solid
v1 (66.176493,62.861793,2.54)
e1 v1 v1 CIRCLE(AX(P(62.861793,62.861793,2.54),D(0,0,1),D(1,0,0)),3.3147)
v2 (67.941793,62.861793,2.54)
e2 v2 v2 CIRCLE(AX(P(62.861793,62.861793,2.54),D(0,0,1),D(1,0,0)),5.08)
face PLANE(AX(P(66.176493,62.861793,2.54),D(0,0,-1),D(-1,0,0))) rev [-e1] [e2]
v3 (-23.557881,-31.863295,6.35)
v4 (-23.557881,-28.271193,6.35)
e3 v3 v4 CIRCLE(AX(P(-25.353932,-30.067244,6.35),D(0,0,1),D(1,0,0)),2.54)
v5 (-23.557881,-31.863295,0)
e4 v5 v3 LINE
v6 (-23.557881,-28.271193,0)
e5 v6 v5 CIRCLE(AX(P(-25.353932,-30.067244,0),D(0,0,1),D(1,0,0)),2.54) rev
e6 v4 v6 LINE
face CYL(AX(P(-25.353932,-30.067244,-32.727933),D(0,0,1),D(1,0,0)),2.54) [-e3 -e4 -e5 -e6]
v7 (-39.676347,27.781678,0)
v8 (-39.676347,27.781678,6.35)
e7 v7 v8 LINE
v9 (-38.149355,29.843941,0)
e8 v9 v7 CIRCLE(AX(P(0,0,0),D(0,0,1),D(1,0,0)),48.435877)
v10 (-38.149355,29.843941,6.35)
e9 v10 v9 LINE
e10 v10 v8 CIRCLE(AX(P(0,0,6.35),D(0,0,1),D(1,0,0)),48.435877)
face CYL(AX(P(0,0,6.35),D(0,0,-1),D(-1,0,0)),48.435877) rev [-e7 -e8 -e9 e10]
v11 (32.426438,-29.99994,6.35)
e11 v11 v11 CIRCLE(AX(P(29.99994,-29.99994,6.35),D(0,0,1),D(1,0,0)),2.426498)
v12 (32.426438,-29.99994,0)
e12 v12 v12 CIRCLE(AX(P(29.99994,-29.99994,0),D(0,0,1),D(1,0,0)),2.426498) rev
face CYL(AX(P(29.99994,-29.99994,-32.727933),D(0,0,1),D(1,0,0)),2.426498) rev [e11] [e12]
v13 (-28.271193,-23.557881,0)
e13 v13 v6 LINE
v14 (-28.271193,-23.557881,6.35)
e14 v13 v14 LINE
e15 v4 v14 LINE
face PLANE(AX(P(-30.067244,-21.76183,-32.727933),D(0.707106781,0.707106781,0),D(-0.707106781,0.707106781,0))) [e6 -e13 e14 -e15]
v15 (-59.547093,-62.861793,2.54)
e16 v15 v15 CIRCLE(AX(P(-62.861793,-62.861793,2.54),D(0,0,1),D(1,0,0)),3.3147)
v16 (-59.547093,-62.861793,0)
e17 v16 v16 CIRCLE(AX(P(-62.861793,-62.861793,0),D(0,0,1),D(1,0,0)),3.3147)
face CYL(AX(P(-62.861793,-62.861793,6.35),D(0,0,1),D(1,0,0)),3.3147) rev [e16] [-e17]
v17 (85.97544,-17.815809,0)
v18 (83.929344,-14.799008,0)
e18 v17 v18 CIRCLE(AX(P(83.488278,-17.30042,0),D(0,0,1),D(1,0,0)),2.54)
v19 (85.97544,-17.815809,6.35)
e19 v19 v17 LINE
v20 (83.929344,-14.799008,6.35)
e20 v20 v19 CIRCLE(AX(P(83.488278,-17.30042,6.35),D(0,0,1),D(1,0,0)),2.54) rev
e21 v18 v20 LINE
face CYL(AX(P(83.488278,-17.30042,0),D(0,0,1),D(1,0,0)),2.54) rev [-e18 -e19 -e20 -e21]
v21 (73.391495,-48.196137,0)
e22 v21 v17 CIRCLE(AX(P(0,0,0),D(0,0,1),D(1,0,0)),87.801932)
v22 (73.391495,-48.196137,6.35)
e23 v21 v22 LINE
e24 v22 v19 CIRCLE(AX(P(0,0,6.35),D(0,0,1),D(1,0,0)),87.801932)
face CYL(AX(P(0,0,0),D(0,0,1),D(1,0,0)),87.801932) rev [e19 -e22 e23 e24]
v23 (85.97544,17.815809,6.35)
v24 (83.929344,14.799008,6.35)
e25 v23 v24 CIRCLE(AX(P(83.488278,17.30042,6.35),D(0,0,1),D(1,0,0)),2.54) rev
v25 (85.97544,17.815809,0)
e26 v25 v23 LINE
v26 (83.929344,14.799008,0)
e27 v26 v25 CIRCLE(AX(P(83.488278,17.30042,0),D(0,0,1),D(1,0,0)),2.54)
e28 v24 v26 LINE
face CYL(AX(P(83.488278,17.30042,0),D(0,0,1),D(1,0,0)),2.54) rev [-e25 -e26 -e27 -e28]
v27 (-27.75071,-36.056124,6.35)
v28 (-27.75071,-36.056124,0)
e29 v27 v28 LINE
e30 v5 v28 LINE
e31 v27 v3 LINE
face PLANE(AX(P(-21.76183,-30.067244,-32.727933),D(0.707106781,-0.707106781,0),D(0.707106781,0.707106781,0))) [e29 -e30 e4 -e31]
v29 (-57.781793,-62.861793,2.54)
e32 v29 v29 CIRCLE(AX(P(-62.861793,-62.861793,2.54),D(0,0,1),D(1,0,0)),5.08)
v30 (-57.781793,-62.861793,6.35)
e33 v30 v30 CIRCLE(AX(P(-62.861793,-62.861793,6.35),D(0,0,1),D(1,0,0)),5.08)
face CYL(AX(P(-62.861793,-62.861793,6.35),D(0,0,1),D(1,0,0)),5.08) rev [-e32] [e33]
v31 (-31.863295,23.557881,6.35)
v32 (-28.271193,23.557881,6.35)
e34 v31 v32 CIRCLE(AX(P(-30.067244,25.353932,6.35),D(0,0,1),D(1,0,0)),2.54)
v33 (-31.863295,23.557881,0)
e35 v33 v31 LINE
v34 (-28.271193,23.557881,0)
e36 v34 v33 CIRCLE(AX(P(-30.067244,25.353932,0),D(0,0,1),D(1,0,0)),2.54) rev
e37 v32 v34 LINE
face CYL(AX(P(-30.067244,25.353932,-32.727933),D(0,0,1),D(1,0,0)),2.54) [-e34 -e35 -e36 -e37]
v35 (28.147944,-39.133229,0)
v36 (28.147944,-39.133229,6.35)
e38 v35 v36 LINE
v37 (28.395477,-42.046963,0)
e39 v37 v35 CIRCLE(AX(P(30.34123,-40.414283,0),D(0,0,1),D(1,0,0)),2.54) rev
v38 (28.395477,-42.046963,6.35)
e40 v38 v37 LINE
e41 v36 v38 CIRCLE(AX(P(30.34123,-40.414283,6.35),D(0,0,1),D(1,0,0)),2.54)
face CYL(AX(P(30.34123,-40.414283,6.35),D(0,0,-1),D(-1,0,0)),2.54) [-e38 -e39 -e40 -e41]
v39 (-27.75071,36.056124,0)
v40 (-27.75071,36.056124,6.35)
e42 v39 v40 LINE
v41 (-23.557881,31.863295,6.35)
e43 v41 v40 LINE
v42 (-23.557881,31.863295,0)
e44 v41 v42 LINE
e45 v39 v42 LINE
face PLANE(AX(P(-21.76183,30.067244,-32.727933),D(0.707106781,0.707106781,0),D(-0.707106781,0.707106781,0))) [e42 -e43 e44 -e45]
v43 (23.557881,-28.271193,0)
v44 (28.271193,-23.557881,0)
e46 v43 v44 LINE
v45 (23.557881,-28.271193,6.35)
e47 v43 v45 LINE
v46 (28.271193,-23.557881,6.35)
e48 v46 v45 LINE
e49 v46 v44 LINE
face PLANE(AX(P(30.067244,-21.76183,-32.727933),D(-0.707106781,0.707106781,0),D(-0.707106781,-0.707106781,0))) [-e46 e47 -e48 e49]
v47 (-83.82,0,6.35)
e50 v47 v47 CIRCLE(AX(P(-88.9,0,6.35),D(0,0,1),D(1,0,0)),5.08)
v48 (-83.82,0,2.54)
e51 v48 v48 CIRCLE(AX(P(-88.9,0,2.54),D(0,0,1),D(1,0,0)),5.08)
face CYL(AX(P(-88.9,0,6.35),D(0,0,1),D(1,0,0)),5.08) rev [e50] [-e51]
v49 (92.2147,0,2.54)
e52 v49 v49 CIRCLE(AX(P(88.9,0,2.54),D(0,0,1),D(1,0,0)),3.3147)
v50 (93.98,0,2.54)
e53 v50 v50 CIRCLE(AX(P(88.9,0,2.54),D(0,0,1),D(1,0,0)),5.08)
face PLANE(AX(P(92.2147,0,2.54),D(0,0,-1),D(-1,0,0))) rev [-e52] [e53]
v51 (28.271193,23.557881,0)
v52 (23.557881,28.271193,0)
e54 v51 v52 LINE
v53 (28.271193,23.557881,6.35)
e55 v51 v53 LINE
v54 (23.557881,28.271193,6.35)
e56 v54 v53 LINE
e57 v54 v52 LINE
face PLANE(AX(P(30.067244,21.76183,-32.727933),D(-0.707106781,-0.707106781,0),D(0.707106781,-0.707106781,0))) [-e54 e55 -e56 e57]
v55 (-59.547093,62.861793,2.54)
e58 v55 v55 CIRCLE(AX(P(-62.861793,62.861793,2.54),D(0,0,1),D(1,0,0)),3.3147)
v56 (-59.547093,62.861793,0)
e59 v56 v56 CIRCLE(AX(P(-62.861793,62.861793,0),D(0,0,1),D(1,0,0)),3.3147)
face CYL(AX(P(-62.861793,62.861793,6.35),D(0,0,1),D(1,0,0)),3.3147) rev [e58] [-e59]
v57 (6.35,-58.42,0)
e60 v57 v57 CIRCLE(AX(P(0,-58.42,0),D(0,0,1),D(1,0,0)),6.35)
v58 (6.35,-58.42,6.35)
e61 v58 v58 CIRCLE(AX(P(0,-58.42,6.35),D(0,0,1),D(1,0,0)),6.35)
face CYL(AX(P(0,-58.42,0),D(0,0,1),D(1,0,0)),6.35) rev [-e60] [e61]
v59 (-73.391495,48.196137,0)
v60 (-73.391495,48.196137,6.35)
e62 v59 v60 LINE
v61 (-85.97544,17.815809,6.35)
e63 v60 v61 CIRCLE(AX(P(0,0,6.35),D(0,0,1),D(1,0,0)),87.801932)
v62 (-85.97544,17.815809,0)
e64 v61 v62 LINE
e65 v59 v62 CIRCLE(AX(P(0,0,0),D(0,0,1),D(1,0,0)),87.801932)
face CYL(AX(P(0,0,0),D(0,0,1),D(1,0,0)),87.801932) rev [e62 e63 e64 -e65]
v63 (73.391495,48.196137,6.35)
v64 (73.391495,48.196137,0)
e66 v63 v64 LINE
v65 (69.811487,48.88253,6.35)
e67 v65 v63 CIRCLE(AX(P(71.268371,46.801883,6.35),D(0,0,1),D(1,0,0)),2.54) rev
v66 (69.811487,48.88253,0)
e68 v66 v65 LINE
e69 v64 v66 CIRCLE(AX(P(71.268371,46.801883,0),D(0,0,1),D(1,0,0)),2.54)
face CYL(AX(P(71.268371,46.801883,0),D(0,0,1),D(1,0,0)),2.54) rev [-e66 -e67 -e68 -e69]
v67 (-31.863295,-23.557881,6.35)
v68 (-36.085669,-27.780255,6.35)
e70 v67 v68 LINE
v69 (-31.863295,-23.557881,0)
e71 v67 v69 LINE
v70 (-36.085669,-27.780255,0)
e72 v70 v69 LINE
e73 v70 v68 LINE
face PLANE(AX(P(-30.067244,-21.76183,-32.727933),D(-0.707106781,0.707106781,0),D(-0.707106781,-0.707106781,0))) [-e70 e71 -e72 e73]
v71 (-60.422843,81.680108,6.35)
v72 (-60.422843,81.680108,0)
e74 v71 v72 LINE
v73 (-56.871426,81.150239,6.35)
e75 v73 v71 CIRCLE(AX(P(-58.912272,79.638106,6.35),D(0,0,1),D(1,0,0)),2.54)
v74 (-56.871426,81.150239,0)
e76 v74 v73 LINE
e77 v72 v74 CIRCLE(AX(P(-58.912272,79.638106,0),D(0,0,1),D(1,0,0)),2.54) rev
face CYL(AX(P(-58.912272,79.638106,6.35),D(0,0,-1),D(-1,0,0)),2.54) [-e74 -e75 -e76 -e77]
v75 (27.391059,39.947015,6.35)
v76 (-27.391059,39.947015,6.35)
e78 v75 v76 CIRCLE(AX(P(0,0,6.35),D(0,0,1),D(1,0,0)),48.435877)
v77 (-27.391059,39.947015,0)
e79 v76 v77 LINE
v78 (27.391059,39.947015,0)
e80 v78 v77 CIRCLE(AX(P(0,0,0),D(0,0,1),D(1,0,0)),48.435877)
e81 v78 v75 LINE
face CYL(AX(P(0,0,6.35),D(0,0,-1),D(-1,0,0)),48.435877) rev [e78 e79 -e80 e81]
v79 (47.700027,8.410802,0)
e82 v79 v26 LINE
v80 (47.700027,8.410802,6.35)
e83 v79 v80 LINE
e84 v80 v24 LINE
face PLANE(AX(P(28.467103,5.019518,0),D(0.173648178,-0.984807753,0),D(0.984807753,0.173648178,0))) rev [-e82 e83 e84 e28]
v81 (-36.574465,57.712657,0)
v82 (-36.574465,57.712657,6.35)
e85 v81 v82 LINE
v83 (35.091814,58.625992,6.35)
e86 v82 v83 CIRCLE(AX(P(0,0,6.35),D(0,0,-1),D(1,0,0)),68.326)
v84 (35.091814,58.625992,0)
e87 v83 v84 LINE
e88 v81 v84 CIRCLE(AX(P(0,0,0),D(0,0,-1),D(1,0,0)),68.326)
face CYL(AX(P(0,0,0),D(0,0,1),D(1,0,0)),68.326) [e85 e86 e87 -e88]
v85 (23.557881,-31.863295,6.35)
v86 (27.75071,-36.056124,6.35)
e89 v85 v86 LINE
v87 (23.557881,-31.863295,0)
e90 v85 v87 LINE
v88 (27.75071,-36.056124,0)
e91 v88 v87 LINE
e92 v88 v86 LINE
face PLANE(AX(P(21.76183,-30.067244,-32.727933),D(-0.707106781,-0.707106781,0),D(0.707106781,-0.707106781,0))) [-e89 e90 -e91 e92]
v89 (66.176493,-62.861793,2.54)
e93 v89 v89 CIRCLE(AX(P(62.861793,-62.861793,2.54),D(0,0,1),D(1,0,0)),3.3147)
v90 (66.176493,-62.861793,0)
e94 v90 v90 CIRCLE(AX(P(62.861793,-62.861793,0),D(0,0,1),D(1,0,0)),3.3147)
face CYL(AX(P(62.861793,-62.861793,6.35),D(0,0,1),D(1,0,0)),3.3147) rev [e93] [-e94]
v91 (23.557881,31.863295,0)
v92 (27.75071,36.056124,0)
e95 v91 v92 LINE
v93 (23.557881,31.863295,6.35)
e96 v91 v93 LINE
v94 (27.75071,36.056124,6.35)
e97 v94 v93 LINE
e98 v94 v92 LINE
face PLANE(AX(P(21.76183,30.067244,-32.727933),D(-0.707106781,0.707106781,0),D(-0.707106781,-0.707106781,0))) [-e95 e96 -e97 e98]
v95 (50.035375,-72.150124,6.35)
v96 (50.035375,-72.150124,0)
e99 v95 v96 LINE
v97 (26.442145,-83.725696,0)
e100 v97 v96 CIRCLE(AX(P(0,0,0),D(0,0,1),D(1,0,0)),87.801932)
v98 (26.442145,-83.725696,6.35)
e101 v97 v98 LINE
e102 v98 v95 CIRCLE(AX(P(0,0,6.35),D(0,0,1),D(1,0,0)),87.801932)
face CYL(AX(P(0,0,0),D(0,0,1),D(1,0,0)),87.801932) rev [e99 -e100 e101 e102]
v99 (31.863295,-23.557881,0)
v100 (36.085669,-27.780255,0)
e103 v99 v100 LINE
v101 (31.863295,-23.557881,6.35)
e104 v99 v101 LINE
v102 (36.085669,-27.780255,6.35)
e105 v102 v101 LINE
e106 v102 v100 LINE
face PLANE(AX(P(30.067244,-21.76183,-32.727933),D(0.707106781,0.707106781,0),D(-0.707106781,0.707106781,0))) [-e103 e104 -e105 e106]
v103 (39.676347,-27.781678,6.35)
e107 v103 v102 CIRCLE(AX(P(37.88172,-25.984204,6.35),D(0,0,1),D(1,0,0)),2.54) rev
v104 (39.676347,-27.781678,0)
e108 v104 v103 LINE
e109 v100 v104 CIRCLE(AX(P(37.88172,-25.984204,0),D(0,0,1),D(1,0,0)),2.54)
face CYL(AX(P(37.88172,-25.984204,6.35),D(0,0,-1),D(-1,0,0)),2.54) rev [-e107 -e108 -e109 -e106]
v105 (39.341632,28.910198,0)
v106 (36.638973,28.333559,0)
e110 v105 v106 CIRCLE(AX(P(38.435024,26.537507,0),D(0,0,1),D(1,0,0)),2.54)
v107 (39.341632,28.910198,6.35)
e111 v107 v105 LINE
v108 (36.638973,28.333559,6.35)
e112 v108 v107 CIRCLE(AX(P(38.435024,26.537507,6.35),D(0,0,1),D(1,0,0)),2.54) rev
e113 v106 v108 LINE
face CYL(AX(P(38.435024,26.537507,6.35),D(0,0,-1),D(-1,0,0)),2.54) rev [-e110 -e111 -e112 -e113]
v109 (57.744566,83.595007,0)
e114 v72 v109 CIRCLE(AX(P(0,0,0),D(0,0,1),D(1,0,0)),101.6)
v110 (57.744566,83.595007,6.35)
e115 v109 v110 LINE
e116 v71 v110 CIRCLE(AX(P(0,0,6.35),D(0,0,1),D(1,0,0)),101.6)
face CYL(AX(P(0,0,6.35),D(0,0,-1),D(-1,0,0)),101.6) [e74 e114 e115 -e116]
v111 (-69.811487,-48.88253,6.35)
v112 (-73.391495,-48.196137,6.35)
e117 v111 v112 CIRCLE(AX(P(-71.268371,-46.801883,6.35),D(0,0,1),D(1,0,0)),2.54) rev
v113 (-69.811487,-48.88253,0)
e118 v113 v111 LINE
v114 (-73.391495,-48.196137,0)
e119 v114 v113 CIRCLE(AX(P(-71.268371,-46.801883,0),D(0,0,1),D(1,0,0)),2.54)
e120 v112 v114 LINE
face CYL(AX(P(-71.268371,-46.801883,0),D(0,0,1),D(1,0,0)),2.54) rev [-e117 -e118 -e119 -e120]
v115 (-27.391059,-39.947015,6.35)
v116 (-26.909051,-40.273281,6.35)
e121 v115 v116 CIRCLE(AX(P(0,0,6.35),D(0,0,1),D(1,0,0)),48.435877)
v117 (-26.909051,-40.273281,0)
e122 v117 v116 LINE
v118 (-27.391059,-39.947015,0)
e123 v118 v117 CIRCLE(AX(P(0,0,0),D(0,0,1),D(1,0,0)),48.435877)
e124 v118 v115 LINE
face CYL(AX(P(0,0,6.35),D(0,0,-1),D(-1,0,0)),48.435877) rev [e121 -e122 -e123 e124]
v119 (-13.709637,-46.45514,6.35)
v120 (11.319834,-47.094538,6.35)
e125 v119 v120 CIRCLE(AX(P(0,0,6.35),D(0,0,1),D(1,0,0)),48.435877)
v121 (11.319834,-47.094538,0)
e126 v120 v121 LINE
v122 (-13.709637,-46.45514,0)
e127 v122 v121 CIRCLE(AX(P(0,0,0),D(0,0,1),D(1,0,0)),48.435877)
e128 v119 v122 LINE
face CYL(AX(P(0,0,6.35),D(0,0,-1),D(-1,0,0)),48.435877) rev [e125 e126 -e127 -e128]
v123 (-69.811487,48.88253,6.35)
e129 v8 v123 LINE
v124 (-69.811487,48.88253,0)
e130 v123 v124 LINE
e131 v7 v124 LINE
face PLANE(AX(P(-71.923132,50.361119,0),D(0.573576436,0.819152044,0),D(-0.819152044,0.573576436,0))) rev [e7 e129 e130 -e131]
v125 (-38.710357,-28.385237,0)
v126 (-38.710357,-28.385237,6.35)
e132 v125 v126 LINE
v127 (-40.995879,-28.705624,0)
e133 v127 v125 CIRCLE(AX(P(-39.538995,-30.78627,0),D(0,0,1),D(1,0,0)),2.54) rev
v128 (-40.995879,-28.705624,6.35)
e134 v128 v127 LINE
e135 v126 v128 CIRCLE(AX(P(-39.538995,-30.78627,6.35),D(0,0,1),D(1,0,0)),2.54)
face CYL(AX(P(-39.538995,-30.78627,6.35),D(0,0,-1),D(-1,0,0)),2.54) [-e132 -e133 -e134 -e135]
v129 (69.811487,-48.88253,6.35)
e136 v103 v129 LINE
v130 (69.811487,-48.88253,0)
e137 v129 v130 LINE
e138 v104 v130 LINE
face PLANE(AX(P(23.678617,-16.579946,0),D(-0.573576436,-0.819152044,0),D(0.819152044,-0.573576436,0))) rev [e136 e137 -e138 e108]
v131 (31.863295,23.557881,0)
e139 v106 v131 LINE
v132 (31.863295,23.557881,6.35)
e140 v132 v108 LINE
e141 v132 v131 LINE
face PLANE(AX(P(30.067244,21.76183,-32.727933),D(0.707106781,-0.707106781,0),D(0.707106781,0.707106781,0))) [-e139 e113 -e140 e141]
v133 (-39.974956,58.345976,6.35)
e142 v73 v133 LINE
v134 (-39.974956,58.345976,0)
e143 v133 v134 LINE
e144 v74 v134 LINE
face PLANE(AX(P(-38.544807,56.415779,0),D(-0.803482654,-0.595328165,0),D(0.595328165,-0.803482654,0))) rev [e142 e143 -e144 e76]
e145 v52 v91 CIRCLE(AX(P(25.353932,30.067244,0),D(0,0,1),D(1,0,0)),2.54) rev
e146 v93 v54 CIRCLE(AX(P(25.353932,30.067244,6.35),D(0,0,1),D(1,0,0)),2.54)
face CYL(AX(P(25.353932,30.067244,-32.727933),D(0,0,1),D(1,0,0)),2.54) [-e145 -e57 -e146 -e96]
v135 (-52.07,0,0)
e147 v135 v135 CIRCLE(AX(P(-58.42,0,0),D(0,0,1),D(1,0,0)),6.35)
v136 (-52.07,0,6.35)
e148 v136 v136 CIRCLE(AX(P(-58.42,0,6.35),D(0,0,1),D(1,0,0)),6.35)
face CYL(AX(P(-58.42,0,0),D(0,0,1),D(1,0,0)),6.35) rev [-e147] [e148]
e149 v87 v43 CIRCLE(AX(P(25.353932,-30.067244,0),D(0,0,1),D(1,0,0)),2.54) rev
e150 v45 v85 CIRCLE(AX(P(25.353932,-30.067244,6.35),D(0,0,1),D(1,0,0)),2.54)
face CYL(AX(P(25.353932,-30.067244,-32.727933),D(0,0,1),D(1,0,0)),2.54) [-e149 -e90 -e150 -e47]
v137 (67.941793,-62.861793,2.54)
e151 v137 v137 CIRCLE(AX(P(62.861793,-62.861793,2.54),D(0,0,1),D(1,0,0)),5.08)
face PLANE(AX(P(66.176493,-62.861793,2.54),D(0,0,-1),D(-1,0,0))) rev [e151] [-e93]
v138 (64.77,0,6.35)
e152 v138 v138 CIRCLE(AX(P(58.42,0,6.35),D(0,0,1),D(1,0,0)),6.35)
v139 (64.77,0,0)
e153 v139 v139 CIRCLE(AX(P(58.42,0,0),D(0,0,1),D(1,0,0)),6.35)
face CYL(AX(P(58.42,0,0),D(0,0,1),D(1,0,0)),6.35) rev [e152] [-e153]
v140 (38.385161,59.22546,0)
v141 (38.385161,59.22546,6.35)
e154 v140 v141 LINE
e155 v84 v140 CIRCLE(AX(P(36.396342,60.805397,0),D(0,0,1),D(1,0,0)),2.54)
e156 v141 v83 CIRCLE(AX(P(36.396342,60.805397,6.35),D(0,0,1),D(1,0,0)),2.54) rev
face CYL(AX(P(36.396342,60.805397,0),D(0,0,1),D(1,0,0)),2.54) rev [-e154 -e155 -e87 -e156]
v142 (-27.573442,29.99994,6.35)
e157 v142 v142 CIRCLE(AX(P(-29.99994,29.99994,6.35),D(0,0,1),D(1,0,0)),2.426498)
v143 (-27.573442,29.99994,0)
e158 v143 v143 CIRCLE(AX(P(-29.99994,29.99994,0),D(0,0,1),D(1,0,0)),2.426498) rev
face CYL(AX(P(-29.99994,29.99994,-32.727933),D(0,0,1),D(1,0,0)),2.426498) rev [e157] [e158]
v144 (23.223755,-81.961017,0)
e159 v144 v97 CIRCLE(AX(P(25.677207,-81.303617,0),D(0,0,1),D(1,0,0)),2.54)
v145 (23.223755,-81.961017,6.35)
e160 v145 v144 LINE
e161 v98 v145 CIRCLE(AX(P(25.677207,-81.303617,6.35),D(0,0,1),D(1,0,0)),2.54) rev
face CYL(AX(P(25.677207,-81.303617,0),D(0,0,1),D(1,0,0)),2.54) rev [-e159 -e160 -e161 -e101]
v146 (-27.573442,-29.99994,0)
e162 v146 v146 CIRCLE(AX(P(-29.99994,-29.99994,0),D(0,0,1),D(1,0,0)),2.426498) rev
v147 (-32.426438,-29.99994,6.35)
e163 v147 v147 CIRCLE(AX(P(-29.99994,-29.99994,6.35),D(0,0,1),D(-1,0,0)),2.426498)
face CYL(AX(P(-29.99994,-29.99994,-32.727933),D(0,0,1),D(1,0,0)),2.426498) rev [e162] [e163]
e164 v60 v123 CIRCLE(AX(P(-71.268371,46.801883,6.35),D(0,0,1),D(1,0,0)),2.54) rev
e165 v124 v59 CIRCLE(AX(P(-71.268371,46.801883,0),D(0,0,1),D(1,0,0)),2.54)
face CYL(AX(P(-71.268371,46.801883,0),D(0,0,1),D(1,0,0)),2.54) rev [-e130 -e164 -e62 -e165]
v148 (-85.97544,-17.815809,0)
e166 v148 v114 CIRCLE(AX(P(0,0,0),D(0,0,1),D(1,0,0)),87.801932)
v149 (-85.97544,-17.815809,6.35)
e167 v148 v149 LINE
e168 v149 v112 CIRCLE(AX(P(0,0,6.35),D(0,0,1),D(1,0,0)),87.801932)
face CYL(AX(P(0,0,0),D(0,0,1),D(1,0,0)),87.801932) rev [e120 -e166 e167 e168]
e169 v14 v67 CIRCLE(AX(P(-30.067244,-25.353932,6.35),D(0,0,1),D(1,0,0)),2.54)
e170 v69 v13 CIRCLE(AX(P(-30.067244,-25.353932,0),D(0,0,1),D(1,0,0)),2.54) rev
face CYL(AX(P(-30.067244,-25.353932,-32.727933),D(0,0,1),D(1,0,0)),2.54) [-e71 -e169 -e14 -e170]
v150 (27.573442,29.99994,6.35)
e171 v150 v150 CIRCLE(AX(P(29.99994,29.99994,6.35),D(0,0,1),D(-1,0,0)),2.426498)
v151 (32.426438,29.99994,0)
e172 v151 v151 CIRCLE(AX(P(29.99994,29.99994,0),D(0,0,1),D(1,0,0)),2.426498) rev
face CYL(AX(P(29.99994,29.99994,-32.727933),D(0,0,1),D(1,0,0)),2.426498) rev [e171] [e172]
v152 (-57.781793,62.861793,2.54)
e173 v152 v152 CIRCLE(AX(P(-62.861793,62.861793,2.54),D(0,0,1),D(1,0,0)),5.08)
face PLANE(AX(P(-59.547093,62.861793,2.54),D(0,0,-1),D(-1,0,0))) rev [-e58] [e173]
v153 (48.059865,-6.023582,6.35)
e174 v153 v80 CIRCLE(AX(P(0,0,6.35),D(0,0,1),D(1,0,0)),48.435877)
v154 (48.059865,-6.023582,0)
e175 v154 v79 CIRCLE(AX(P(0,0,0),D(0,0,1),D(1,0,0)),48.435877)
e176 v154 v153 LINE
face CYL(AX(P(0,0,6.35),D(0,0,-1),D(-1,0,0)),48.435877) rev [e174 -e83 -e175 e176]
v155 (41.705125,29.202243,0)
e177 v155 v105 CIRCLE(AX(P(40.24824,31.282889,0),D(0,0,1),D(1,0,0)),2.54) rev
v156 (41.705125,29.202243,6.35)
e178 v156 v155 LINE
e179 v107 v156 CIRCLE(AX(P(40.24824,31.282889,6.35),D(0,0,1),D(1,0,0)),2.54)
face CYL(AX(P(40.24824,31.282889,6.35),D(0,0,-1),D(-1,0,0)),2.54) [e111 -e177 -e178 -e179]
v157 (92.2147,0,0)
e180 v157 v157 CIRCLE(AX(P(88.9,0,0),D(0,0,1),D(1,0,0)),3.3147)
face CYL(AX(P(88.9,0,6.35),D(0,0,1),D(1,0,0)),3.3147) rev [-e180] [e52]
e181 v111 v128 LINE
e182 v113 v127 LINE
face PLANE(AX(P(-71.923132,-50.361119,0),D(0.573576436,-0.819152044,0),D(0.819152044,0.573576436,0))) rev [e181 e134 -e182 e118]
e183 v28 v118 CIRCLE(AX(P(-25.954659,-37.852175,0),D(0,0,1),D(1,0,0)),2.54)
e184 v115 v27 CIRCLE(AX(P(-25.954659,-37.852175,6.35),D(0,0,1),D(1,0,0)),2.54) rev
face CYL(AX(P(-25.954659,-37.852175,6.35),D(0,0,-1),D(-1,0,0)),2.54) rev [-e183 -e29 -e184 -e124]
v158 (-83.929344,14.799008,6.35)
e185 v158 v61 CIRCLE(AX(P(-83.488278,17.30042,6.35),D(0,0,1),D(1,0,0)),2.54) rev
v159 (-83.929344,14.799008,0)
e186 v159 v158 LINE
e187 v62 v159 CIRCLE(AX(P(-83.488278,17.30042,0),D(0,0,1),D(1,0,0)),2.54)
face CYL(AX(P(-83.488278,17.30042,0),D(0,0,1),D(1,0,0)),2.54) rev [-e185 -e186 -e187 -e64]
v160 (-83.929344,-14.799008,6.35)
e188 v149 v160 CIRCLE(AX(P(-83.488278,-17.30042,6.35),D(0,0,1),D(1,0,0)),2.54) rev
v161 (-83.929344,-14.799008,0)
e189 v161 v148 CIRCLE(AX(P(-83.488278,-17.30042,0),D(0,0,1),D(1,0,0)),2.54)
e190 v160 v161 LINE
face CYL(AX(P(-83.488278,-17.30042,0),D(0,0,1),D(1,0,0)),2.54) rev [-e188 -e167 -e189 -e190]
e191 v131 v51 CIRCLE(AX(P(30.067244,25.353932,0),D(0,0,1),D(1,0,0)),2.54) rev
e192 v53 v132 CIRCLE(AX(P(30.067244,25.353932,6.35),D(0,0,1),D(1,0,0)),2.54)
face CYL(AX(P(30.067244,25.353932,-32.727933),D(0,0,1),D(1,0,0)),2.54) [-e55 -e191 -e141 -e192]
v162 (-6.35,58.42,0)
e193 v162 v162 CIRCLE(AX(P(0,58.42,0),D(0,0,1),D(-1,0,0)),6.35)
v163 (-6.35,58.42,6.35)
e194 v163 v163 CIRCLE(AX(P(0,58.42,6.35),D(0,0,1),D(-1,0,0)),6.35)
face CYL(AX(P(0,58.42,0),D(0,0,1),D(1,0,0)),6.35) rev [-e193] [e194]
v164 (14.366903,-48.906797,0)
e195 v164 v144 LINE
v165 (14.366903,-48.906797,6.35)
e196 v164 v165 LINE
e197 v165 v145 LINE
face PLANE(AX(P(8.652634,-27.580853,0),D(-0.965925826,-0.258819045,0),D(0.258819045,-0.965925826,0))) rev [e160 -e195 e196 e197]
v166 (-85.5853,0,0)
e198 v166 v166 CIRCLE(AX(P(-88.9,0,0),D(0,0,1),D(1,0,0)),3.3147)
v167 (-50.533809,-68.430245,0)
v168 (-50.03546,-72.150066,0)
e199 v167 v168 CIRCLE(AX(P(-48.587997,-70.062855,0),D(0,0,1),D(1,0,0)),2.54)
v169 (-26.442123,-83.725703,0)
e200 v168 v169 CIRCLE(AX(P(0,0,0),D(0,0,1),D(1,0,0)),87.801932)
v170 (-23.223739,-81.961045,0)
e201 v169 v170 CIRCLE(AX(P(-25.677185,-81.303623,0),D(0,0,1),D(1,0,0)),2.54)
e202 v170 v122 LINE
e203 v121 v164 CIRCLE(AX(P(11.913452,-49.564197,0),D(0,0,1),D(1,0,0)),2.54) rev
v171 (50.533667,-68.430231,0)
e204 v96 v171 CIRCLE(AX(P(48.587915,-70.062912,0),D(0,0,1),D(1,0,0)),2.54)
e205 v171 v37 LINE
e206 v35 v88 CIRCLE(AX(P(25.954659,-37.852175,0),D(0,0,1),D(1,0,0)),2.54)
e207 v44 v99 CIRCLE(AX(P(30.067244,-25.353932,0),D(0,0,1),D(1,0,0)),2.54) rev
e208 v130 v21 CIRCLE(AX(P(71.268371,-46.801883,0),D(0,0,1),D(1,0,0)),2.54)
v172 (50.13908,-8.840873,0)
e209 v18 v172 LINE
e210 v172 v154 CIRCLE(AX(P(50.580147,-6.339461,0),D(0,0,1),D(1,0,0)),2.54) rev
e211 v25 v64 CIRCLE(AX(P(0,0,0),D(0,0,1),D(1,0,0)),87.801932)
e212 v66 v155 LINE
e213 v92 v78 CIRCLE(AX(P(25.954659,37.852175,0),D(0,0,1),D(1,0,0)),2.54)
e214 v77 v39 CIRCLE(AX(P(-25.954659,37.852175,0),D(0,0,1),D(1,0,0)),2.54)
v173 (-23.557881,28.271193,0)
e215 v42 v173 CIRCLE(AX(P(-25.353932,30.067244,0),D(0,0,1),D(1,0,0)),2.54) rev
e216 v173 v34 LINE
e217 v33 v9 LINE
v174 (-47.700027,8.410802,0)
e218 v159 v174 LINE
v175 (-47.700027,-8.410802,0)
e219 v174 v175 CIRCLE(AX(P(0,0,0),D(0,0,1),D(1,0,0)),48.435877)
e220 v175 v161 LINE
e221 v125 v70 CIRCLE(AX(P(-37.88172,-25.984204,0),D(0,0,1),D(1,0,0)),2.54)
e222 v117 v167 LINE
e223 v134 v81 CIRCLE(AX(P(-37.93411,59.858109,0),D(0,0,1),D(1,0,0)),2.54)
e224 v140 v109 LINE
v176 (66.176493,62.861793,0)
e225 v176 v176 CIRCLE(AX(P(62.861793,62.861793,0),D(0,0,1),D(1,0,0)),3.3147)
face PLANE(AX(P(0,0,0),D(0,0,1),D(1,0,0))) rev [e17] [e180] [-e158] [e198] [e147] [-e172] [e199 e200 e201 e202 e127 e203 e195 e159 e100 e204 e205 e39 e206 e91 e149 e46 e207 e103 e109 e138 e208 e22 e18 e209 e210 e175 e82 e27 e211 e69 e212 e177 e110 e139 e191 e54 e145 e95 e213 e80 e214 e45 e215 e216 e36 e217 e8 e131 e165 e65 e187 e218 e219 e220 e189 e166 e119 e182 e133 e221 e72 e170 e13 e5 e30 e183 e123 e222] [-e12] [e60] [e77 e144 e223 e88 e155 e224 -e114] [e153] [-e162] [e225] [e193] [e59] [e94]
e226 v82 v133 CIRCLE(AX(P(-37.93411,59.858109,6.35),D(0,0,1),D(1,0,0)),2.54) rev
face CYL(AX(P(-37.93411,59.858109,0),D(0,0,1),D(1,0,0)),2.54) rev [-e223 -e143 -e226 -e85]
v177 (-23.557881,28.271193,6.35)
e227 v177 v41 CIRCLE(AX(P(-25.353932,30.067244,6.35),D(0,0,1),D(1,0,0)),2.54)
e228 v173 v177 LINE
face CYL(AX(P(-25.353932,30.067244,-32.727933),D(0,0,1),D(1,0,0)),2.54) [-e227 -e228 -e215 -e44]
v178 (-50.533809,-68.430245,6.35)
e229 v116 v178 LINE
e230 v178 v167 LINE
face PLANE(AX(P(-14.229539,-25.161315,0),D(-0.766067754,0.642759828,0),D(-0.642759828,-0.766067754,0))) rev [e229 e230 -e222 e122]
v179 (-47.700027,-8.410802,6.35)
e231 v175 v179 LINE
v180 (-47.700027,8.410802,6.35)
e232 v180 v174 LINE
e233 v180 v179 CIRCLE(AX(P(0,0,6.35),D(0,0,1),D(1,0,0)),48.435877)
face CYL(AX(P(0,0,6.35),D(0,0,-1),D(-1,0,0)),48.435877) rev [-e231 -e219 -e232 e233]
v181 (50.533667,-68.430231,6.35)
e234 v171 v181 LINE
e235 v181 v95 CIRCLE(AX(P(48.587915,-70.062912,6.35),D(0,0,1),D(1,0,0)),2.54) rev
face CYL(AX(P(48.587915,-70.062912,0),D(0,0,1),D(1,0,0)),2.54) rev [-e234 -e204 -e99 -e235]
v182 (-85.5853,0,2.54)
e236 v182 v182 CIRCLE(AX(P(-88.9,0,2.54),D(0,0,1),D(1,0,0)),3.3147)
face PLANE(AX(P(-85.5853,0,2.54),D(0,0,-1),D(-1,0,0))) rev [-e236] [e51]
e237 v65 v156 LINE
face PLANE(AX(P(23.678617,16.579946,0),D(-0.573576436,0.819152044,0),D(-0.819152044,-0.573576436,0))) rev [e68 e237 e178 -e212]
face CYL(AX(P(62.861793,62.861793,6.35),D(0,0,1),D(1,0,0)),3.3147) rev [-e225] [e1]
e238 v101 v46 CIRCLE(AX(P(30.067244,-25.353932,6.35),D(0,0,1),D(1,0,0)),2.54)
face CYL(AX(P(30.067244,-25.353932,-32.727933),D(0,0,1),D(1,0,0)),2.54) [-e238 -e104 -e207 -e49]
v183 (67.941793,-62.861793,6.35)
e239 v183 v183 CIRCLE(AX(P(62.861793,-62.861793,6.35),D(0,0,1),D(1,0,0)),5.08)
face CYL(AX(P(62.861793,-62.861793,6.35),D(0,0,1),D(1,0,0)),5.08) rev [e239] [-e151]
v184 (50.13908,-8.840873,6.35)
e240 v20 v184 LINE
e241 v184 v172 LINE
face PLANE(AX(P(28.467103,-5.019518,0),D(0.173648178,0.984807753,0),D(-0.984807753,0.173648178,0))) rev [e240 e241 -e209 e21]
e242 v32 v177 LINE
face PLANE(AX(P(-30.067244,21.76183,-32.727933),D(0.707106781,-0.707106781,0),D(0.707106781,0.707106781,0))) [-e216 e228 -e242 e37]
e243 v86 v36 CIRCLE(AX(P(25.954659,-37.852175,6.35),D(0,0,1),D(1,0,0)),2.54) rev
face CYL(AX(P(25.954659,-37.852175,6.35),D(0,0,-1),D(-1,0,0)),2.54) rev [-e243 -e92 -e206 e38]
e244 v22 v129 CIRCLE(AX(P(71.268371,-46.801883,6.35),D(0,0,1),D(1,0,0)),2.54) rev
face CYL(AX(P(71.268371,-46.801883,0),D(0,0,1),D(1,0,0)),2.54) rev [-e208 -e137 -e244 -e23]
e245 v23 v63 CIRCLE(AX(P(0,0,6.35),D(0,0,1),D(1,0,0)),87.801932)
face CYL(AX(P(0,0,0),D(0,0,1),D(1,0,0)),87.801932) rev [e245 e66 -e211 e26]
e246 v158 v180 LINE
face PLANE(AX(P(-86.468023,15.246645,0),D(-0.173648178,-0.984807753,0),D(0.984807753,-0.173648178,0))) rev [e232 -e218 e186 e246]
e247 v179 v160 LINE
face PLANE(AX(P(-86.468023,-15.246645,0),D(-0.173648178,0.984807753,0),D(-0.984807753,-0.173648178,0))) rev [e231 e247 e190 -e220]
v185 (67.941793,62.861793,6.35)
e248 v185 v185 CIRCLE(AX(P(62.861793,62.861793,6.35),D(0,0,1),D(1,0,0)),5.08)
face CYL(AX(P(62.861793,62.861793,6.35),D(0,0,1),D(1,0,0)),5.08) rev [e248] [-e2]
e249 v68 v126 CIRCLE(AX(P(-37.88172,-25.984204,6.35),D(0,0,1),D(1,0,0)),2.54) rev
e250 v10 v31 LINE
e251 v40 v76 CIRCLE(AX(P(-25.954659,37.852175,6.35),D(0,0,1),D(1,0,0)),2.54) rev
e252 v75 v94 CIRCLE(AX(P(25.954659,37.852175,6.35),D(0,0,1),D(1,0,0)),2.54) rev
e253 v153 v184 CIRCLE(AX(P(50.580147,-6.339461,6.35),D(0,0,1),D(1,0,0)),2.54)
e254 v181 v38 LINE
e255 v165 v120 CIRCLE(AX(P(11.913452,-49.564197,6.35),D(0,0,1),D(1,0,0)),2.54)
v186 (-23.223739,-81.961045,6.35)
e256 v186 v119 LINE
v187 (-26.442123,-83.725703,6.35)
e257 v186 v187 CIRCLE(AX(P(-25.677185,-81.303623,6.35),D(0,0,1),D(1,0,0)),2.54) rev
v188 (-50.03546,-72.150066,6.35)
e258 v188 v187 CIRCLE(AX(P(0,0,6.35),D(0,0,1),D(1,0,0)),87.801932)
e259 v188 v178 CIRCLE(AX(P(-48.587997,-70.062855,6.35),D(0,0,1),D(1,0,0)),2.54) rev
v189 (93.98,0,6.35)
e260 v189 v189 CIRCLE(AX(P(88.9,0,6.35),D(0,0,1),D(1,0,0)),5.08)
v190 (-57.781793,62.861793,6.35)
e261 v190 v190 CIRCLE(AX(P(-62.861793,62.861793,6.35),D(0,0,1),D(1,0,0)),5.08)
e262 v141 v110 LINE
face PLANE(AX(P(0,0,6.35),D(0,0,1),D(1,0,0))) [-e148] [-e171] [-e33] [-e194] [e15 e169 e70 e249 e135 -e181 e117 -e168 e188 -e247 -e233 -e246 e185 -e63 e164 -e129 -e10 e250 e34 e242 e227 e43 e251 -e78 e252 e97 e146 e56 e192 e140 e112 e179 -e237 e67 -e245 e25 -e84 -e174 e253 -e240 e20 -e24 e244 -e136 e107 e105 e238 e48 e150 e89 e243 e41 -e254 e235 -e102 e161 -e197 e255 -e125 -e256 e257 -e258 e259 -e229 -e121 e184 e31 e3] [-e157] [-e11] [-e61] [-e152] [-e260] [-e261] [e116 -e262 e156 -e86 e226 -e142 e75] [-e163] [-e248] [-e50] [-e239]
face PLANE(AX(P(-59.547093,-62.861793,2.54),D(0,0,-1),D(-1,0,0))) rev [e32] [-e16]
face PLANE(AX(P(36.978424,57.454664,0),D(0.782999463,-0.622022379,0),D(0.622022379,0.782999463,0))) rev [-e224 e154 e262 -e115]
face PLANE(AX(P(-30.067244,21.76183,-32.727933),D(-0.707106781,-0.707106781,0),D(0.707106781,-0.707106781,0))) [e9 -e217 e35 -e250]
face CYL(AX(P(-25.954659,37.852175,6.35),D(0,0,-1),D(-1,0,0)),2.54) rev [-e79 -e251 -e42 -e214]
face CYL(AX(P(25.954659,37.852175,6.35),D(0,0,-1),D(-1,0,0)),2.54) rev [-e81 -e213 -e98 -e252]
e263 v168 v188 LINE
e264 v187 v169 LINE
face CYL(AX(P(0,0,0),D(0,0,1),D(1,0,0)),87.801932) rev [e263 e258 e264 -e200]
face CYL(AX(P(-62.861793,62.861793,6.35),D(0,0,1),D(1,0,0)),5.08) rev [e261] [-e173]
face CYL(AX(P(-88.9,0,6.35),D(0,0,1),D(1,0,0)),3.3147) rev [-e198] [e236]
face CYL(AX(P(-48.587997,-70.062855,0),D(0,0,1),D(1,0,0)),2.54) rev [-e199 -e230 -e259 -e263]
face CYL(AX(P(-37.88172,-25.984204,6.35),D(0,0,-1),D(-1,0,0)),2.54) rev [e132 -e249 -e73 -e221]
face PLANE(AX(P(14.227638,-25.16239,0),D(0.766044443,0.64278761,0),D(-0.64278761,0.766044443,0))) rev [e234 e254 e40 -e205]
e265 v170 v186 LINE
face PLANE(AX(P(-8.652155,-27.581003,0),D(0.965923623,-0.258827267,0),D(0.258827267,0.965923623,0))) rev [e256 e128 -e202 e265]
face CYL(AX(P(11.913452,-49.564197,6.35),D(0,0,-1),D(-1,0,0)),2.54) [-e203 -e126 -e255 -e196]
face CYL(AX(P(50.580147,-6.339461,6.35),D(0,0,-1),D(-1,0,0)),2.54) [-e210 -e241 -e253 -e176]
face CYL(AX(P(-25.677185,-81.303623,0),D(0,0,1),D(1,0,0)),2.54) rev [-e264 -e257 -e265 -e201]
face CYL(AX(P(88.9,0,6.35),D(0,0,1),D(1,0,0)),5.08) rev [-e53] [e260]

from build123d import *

# Parameters (mm, degrees)
SKETCH1_R                                        = 101.6
SKETCH1_R_2                                      = 48.435876627
EXTRUDE1_DEPTH                                   = 6.35
CBORE_FOR_1_4_SOCKET_HEAD_CAP_SCREW1_D           = 6.6294
CBORE_FOR_1_4_SOCKET_HEAD_CAP_SCREW1_CBORE_D     = 10.16
CBORE_FOR_1_4_SOCKET_HEAD_CAP_SCREW1_CBORE_DEPTH = 3.81
SKETCH12_R                                       = 6.35
CUT_EXTRUDE2_DEPTH                               = 144.824345992
SKETCH13_R                                       = 2.426498152
EXTRUDE2_DEPTH                                   = 6.35
CUT_EXTRUDE3_DEPTH                               = 6.35
FILLET1_R                                        = 2.54
FILLET2_R                                        = 2.54
FILLET3_R                                        = 2.54
FILLET6_R                                        = 2.54
FILLET9_R                                        = 2.54


with BuildPart() as part:
    # Sketch1 → Extrude1 (new body)
    with BuildSketch(Plane.XY):
        Circle(SKETCH1_R)
        Circle(SKETCH1_R_2, mode=Mode.SUBTRACT)
    extrude(amount=EXTRUDE1_DEPTH)

    # CBORE for 1/4 Socket Head Cap Screw1 (through all)
    with Locations(Plane.XY.offset(6.35)):
        with Locations((62.861792847, -62.861792847), (88.9, 0), (62.861792847, 62.861792847), (-62.861792847, 62.861792847), (-88.9, 0), (-62.861792847, -62.861792847)):
            CounterBoreHole(CBORE_FOR_1_4_SOCKET_HEAD_CAP_SCREW1_D / 2, CBORE_FOR_1_4_SOCKET_HEAD_CAP_SCREW1_CBORE_D / 2, CBORE_FOR_1_4_SOCKET_HEAD_CAP_SCREW1_CBORE_DEPTH)

    # Sketch12 → Cut-Extrude2 (cut, through all)
    with BuildSketch(Plane.XY.offset(6.35)):
        with Locations((0, -58.42)):
            Circle(SKETCH12_R)
        with Locations((-58.42, 0)):
            Circle(SKETCH12_R)
        with Locations((58.42, 0)):
            Circle(SKETCH12_R)
        with Locations(Location((0, 58.42, 0), (0, 0, 180))):
            Circle(SKETCH12_R)
    extrude(amount=-CUT_EXTRUDE2_DEPTH, mode=Mode.SUBTRACT)

    # Sketch13 → Extrude2 (add)
    # profile 1 of 4: a face of its own
    with BuildSketch(Plane.XY.offset(6.35)):
        Polygon((30.067243726, -21.76182967), (44.903973325, -36.598559269), (36.598559269, -44.903973325), (21.76182967, -30.067243726), align=None)
        with Locations((29.99994, -29.99994)):
            Circle(SKETCH13_R, mode=Mode.SUBTRACT)
    # profile 2 of 4: a face of its own
    with BuildSketch(Plane.XY.offset(6.35)):
        Polygon((-30.067243726, -21.76182967), (-44.903973325, -36.598559269), (-36.598559269, -44.903973325), (-21.76182967, -30.067243726), align=None)
        with Locations((-29.99994, -29.99994)):
            Circle(SKETCH13_R, mode=Mode.SUBTRACT)
    # profile 3 of 4: a face of its own
    with BuildSketch(Plane.XY.offset(6.35)):
        Polygon((-30.067243726, 21.76182967), (-21.76182967, 30.067243726), (-36.598559269, 44.903973325), (-44.903973325, 36.598559269), align=None)
        with Locations((-29.99994, 29.99994)):
            Circle(SKETCH13_R, mode=Mode.SUBTRACT)
    # profile 4 of 4: a face of its own
    with BuildSketch(Plane.XY.offset(6.35)):
        Polygon((30.067243726, 21.76182967), (21.76182967, 30.067243726), (36.598559269, 44.903973325), (44.903973325, 36.598559269), align=None)
        with Locations((29.99994, 29.99994)):
            Circle(SKETCH13_R, mode=Mode.SUBTRACT)
    extrude(amount=-EXTRUDE2_DEPTH)

    # Sketch14 → Cut-Extrude3 (cut)
    with BuildSketch(Plane.XY.offset(6.35)):
        with BuildLine():
            Line((36.978423652, 57.45466439), (71.6832833, 101.141012966))
            Line((71.6832833, 101.141012966), (0, 148.475476712))
            Line((0, 148.475476712), (-71.6832833, 101.141012966))
            Line((-71.6832833, 101.141012966), (-38.544806548, 56.41577939))
            ThreePointArc((-38.544806548, 56.41577939), (-0.939792187, 68.319536493), (36.978423652, 57.45466439))
        make_face()
        with BuildLine():
            Line((8.652633897, -27.580853172), (23.900424698, -84.486383146))
            ThreePointArc((23.900424698, -84.486383146), (38.731626442, -78.797464115), (52.295107345, -70.52943347))
            Line((52.295107345, -70.52943347), (14.227637724, -25.162389788))
            ThreePointArc((14.227637724, -25.162389788), (11.503866682, -26.518532886), (8.652633897, -27.580853172))
        make_face()
        with BuildLine():
            Line((-71.923131973, 50.361119179), (-23.678617266, 16.579946304))
            ThreePointArc((-23.678617266, 16.579946304), (-26.705896668, 11.061944595), (-28.467103301, 5.019518375))
            Line((-28.467103301, 5.019518375), (-86.468023222, 15.246645463))
            ThreePointArc((-86.468023222, 15.246645463), (-81.118407757, 33.600344651), (-71.923131973, 50.361119179))
        make_face()
        with BuildLine():
            Line((-8.652154992, -27.581003409), (-23.900424698, -84.486383146))
            ThreePointArc((-23.900424698, -84.486383146), (-38.731626442, -78.797464115), (-52.295107345, -70.52943347))
            Line((-52.295107345, -70.52943347), (-14.229539169, -25.161314554))
            ThreePointArc((-14.229539169, -25.161314554), (-11.504638432, -26.518198083), (-8.652154992, -27.581003409))
        make_face()
        with BuildLine():
            Line((-86.468023222, -15.246645463), (-28.467103301, -5.019518375))
            ThreePointArc((-28.467103301, -5.019518375), (-26.705896668, -11.061944595), (-23.678617266, -16.579946304))
            Line((-23.678617266, -16.579946304), (-71.923131973, -50.361119179))
            ThreePointArc((-71.923131973, -50.361119179), (-81.118407757, -33.600344651), (-86.468023222, -15.246645463))
        make_face()
        with BuildLine():
            Line((23.678617266, -16.579946304), (71.923131973, -50.361119179))
            ThreePointArc((71.923131973, -50.361119179), (81.118407757, -33.600344651), (86.468023222, -15.246645463))
            Line((86.468023222, -15.246645463), (28.467103301, -5.019518375))
            ThreePointArc((28.467103301, -5.019518375), (26.705896668, -11.061944595), (23.678617266, -16.579946304))
        make_face()
        with BuildLine():
            Line((28.467103301, 5.019518375), (86.468023222, 15.246645463))
            ThreePointArc((86.468023222, 15.246645463), (81.118407757, 33.600344651), (71.923131973, 50.361119179))
            Line((71.923131973, 50.361119179), (23.678617266, 16.579946304))
            ThreePointArc((23.678617266, 16.579946304), (26.705896668, 11.061944595), (28.467103301, 5.019518375))
        make_face()
    extrude(amount=-CUT_EXTRUDE3_DEPTH, mode=Mode.SUBTRACT)

    # Fillet1
    fillet1_edges = [part.edges().sort_by_distance(p)[0] for p in [
        (-21.76182967, 30.067243726, 3.175),
        (-30.067243726, 21.76182967, 3.175),
        (21.76182967, 30.067243726, 3.175),
        (30.067243726, 21.76182967, 3.175),
        (-58.363526169, 83.1640476, 3.175),
        (52.295107345, -70.52943347, 3.175),
        (23.900424698, -84.486383146, 3.175),
        (-23.900424698, -84.486383146, 3.175),
        (-52.295107345, -70.52943347, 3.175),
        (47.700026827, -8.41080171, 3.175),
        (86.468023222, -15.246645463, 3.175),
        (71.923131973, -50.361119179, 3.175),
        (-71.923131973, -50.361119179, 3.175),
        (-86.468023222, -15.246645463, 3.175),
        (71.923131973, 50.361119179, 3.175),
        (86.468023222, 15.246645463, 3.175),
        (-86.468023222, 15.246645463, 3.175),
        (-71.923131973, 50.361119179, 3.175),
        (29.843941288, -38.149355343, 3.175),
        (30.067243726, -21.76182967, 3.175),
        (21.76182967, -30.067243726, 3.175),
        (-21.76182967, -30.067243726, 3.175),
        (-30.067243726, -21.76182967, 3.175),
    ]]
    fillet(fillet1_edges, radius=FILLET1_R)

    # Fillet2
    # the kernel refuses this fillet: 2.54 mm, written as the material it adds along each edge
    with BuildSketch(Plane(origin=(-38.149355343, -29.843941288, 6.35), x_dir=(0.7071067811865481, 0.7071067811865469, 0), z_dir=(0, 0, -1))) as fillet2_piece_1:
        with BuildLine():
            CenterArc((2.918493499, -2.54), FILLET2_R, 90, 89.954594463)
            ThreePointArc((0.378494296, -2.537987111), (0.172436891, -1.271500497), (0, 0))
            Line((0, 0), (2.918493499, 0))
        make_face()
    extrude(amount=6.35)
    # the kernel refuses this fillet: 2.54 mm, written as the material it takes off along each edge
    with BuildSketch(Plane(origin=(39.676347356, 27.781677508, 12.541699401), x_dir=(0.8191520442889919, 0.5735764363510458, 0), z_dir=(0, 0, -1))) as fillet2_2_piece_1:
        with BuildLine():
            CenterArc((2.47667976, -2.54), FILLET2_R, 90, 87.143912429)
            ThreePointArc((-0.060165151, -2.413438175), (-0.015043624, -1.207093997), (0, 0))
            Line((0, 0), (2.47667976, 0))
        make_face()
    extrude(amount=18.733398802, mode=Mode.SUBTRACT)

    # Fillet3
    # the kernel refuses this fillet: 2.54 mm, written as the material it adds along each edge
    with BuildSketch(Plane(origin=(38.149355343, -29.843941288, 6.35), x_dir=(-0.7071067811865487, 0.7071067811865462, 0), z_dir=(0, 0, -1))) as fillet3_piece_1:
        with BuildLine():
            CenterArc((2.918493499, 2.54), FILLET3_R, 180.045405537, 89.954594463)
            ThreePointArc((0.378494296, 2.537987111), (0.172436891, 1.271500497), (0, 0))
            Line((0, 0), (2.918493499, 0))
        make_face()
    extrude(amount=6.35)
    with BuildSketch(Plane(origin=(-29.843941288, 38.149355343, 6.35), x_dir=(0.8065806519344794, 0.5911240579818674, 0), z_dir=(0, 0, -1))) as fillet3_piece_2:
        with BuildLine():
            CenterArc((2.961349729, 2.538748086), FILLET3_R, 171.236815401, 100.562162322)
            Line((0.451000474, 2.925719166), (0, 0))
            ThreePointArc((0, 0), (1.52054388, -0.023873044), (3.041087761, 0))
        make_face()
    extrude(amount=6.35)
    # the kernel refuses this fillet: 2.54 mm, written as the material it takes off along each edge
    with BuildSketch(Plane(origin=(26.907852458, -40.274081253, 12.135832501), x_dir=(0.6427876096865419, -0.7660444431189757, 0), z_dir=(0, 0, -1))) as fillet3_2_piece_1:
        with BuildLine():
            CenterArc((2.314333001, -2.54), FILLET3_R, 90, 70.288335328)
            Line((-0.076827818, -1.683291217), (-0.3159439, -1.597620338))
            ThreePointArc((-0.3159439, -1.597620338), (-0.19275198, -0.605010424), (-0.252489157, -0.027662711))
            Line((-0.252489157, -0.027662711), (0, 0.254))
            Line((0, 0.254), (2.314333001, 0.254))
            Line((2.314333001, 0.254), (2.314333001, 0))
        make_face()
    extrude(amount=17.921665003, mode=Mode.SUBTRACT)
    with BuildSketch(Plane(origin=(13.709958303, -46.455044807, 12.695601727), x_dir=(-0.9660206148643552, -0.2584650298533501, 0), z_dir=(0, 0, -1))) as fillet3_2_piece_2:
        with BuildLine():
            CenterArc((2.539069601, -2.539171394), FILLET3_R, 91.463547204, 88.51545472)
            Line((-0.000930229, -2.53824052), (0, 0))
            ThreePointArc((0, 0), (1.237097807, -0.015800898), (2.474195614, 0))
        make_face()
    extrude(amount=19.041203453, mode=Mode.SUBTRACT)

    # Fillet6
    fillet6_edges = [part.edges().sort_by_distance(p)[0] for p in [
        (-29.843941288, -38.149355343, 3.175),
        (-39.676347356, -27.781677508, 3.175),
        (38.149355343, 29.843941288, 3.175),
        (29.843941288, 38.149355343, 3.175),
    ]]
    fillet(fillet6_edges, radius=FILLET6_R)

    # Fillet9
    fillet9_edges = [part.edges().sort_by_distance(p)[0] for p in [
        (-38.544806548, 56.41577939, 3.175),
        (36.978423652, 57.45466439, 3.175),
    ]]
    fillet(fillet9_edges, radius=FILLET9_R)


solid = part.part
